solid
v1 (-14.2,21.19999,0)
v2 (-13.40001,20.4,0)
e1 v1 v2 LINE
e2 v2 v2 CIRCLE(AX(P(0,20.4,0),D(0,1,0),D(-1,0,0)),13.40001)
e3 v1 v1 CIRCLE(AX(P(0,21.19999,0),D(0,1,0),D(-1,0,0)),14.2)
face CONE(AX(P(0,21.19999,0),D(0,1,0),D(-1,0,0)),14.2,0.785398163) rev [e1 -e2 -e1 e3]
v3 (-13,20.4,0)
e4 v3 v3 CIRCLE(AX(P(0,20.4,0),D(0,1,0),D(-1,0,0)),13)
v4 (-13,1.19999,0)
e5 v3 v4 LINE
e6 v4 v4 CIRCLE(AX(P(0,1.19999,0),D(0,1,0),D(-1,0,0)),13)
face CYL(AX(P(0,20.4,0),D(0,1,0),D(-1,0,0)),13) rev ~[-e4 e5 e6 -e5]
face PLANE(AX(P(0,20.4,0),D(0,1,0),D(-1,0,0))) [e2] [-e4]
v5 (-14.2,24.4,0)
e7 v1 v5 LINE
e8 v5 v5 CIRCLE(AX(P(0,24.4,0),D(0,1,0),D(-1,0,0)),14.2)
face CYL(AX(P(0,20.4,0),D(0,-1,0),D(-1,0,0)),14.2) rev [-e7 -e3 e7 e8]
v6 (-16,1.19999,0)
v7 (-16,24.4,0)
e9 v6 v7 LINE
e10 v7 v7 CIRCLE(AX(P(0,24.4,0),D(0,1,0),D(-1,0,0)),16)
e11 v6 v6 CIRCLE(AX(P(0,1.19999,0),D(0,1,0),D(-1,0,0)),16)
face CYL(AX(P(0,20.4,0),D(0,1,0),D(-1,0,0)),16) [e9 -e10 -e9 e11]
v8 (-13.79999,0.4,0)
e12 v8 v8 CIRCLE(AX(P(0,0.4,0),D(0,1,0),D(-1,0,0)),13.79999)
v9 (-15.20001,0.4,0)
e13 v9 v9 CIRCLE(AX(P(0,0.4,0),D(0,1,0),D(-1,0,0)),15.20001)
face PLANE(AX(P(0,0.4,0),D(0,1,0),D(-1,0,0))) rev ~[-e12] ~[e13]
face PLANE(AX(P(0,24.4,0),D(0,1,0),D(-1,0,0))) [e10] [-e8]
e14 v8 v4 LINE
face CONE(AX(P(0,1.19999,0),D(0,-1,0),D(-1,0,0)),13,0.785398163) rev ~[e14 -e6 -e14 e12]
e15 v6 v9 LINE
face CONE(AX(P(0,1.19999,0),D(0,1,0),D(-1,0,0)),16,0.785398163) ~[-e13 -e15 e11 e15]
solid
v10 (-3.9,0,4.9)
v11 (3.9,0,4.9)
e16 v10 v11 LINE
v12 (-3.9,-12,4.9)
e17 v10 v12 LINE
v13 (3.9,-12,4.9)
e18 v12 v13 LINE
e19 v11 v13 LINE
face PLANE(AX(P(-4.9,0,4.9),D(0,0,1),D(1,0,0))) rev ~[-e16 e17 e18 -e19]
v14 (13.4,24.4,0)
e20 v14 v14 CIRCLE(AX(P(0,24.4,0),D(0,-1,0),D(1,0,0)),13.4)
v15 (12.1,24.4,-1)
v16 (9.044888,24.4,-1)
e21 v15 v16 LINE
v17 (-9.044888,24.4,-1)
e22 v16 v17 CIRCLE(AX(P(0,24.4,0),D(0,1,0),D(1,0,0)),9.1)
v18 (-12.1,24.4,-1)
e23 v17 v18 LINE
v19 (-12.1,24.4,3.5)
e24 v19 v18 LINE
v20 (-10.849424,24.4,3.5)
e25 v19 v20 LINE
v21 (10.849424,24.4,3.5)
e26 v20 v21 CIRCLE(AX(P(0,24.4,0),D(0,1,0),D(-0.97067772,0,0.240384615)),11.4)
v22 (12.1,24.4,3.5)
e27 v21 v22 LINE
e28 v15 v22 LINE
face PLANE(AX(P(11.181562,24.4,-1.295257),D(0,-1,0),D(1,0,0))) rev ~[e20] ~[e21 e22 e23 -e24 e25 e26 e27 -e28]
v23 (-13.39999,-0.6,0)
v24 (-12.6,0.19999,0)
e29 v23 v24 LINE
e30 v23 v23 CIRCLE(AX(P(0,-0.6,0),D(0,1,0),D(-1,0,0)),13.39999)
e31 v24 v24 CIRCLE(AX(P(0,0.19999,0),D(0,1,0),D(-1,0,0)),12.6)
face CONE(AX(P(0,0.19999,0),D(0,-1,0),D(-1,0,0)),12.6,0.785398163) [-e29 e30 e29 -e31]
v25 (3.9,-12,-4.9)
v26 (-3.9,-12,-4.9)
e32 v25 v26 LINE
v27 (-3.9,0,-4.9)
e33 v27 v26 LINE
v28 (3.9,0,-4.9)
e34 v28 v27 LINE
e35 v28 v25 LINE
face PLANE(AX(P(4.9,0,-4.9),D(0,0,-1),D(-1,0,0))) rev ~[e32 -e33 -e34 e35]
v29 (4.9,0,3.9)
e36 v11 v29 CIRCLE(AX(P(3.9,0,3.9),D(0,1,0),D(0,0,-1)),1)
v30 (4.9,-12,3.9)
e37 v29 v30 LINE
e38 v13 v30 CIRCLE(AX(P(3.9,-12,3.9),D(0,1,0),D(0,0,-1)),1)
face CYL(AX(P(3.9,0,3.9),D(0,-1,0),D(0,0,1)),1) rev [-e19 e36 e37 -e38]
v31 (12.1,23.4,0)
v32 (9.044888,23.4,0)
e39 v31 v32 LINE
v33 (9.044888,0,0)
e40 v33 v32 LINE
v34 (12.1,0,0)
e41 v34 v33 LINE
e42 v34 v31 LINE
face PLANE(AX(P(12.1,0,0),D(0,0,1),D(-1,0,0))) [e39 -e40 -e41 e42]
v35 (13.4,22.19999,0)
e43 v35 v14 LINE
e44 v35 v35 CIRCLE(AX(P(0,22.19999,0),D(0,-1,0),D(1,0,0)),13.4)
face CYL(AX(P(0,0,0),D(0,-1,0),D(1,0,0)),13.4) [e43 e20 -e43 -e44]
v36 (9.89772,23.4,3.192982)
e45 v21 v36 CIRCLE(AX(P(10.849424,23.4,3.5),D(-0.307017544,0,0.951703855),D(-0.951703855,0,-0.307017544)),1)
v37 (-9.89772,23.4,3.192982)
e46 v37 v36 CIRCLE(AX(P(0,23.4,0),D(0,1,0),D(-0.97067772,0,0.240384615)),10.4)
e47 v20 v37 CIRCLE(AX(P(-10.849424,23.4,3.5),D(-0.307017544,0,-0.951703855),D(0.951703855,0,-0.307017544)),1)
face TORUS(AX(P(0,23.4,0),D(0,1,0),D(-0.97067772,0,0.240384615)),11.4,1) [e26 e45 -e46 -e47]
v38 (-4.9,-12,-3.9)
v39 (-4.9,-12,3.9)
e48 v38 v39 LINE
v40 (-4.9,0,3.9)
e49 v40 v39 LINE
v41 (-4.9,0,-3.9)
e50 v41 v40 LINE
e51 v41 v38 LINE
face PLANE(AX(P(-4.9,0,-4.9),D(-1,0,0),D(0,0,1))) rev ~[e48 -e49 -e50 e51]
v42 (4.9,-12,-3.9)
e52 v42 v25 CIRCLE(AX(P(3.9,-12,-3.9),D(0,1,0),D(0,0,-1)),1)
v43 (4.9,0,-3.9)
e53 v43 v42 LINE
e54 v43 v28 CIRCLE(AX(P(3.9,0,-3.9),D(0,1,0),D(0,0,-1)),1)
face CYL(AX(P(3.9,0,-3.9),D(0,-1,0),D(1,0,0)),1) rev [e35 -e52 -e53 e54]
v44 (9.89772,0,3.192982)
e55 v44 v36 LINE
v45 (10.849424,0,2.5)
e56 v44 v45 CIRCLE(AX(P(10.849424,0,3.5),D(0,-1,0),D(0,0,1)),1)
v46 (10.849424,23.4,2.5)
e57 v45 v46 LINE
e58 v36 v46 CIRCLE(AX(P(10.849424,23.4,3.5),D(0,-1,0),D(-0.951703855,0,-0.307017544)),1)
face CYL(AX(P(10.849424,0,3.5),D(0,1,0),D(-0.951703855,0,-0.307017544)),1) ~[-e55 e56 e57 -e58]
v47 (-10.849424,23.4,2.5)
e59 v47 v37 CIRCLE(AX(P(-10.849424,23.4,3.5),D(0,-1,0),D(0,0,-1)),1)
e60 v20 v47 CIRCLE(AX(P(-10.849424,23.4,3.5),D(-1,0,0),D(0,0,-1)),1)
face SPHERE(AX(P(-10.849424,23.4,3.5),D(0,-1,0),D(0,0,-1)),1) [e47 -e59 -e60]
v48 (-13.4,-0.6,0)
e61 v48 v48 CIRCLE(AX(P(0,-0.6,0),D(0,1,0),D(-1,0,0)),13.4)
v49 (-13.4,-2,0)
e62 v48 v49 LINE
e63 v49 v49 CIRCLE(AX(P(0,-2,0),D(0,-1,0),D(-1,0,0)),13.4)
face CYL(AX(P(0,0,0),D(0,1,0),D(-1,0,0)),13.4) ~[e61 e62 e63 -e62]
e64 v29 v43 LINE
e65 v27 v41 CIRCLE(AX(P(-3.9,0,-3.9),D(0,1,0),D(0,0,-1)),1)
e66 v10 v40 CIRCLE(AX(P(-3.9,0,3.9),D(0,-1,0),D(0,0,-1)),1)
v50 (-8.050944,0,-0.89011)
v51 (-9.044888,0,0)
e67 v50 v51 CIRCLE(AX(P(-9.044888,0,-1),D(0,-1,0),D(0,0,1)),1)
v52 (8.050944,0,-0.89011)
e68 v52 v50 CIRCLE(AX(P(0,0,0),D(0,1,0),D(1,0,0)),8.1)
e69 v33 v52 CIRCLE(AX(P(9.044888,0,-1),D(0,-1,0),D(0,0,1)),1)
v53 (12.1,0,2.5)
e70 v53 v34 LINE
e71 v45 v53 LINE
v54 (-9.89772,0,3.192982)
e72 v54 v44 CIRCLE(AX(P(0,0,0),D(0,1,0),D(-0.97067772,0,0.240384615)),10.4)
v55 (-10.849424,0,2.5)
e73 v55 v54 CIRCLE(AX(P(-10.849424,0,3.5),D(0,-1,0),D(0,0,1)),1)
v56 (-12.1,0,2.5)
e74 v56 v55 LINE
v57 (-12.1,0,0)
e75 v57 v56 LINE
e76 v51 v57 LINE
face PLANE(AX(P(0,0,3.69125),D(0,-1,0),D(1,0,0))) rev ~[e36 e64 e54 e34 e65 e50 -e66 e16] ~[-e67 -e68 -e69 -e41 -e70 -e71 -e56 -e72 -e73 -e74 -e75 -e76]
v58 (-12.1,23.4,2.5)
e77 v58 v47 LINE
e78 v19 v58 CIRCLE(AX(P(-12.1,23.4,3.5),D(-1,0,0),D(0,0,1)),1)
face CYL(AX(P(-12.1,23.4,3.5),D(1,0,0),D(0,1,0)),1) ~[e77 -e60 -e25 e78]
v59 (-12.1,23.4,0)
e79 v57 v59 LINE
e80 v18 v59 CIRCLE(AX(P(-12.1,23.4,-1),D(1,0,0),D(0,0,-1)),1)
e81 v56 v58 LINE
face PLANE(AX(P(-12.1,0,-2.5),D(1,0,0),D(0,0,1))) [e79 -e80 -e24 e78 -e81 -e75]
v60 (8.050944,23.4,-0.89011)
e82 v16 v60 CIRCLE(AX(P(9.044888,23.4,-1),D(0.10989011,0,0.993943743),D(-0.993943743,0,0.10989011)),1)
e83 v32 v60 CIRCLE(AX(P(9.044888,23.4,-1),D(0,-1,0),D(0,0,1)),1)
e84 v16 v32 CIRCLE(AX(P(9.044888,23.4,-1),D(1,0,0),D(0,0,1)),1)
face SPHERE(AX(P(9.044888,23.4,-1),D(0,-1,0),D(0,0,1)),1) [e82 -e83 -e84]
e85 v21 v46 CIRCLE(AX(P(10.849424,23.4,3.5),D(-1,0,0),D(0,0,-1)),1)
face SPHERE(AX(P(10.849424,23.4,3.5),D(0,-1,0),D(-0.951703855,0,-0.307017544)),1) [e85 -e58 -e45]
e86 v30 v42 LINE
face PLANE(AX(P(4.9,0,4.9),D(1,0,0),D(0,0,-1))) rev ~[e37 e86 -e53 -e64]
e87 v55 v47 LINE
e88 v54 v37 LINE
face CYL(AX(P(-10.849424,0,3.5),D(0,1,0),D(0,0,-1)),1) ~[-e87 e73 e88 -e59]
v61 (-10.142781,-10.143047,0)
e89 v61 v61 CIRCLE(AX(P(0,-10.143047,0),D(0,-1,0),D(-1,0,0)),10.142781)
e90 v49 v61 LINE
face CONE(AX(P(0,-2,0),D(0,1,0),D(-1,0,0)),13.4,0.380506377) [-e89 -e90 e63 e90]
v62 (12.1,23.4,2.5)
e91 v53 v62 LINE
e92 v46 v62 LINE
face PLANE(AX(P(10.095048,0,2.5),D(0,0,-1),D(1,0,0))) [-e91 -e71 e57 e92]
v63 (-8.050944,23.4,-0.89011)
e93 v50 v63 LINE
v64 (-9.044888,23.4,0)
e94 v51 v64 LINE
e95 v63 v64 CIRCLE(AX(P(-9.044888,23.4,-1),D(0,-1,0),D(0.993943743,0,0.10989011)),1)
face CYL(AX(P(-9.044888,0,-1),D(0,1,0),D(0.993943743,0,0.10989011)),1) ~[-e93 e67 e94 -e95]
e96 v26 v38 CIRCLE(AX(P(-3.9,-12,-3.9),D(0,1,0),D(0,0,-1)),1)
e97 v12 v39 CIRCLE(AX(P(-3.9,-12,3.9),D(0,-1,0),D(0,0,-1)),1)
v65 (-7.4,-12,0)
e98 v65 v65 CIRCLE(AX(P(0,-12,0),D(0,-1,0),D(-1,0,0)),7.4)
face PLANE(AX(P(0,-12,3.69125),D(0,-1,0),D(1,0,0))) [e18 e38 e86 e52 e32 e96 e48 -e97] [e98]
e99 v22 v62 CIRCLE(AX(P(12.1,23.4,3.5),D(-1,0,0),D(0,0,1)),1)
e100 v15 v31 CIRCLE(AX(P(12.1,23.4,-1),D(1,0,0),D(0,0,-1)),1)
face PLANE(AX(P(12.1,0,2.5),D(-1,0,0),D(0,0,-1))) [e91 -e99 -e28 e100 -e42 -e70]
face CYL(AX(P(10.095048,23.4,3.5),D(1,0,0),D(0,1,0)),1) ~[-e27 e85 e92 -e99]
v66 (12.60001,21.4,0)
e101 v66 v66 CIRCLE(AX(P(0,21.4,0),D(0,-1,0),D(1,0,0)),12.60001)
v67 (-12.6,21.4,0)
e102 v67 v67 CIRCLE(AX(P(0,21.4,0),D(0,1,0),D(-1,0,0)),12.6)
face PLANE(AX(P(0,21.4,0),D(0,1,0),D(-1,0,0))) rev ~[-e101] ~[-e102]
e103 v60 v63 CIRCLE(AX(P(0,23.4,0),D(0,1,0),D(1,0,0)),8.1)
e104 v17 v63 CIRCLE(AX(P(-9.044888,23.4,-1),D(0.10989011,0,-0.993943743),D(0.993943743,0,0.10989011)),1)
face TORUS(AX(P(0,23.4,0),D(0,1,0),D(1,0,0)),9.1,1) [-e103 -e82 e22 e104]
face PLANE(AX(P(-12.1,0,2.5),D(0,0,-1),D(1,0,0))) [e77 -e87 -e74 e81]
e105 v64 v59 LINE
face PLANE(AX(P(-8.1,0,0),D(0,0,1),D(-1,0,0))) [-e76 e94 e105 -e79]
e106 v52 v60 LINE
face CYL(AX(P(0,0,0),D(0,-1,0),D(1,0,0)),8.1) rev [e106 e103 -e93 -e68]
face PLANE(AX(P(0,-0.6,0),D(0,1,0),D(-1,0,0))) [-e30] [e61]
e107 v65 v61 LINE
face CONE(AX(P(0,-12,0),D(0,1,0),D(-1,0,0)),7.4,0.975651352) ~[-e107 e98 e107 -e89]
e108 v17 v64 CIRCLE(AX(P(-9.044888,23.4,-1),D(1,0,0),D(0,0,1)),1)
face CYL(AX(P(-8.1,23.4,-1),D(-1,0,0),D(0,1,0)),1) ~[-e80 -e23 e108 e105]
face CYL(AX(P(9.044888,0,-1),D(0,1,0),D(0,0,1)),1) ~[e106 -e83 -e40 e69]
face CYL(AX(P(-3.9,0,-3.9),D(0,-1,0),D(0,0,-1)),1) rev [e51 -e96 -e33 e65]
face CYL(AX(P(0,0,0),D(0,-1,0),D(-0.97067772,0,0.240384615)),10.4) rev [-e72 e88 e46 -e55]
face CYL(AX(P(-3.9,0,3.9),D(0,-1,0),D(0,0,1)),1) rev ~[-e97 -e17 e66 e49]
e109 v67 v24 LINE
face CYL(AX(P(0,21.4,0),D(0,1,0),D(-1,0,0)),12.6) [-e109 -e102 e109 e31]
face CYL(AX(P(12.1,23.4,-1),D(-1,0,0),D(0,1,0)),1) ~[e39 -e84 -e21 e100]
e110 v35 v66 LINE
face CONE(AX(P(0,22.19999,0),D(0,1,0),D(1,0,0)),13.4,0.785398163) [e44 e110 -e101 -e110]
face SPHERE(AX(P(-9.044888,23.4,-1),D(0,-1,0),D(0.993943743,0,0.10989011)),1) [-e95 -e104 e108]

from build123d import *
from build123d import SkipClean  # not in build123d's __all__

# Parameters (mm, degrees)
F1_DEPTH   = 24.4
F2_DEPTH   = 12
F3_R       = 1
F4_DEPTH   = 24.4
F5_SIZE2   = 4
F5_SIZE    = 10
F7_R       = 13.4
F7_R_2     = 12.6
F8_DEPTH   = 22
F11_SIZE   = 2
F10_R      = 16
F10_R_2    = 14.2
F10_R_3    = 13
F12_DEPTH  = 20
F13_DEPTH  = 4
F14_SIZE   = 0.79999
F14_2_SIZE = 0.79999
F15_R      = 1


# Not quite as in the source:
# - two fillets or chamfers of one size are made in one step
# - a fillet or chamfer is up to 0.001 mm smaller than in the source, because OpenCascade refuses the exact size
# - after a boolean that leaves OpenCascade's solid faulty, fix() repairs it


with BuildPart() as f1:
    # F0 (on Front) → F1 (new body)
    with BuildSketch(Plane.XZ):
        with BuildLine():
            Line((12.1, -2.5), (10.0950482911, -2.5))
            ThreePointArc((10.0950482911, -2.5), (0, -10.4), (-10.0950482911, -2.5))
            Line((-10.0950482911, -2.5), (-12.1, -2.5))
            Line((-12.1, -2.5), (-12.1, 0))
            Line((-12.1, 0), (-13.4, 0))
            ThreePointArc((-13.4, 0), (0, -13.4), (13.4, 0))
            Line((13.4, 0), (12.1, 0))
            Line((12.1, 0), (12.1, -2.5))
        make_face()
        with BuildLine():
            ThreePointArc((-10.0950482911, 2.5), (0, 10.4), (10.0950482911, 2.5))
            Line((10.0950482911, 2.5), (12.1, 2.5))
            Line((12.1, 2.5), (12.1, 0))
            Line((12.1, 0), (13.4, 0))
            ThreePointArc((13.4, 0), (0, 13.4), (-13.4, 0))
            Line((-13.4, 0), (-12.1, 0))
            Line((-12.1, 0), (-12.1, 2.5))
            Line((-12.1, 2.5), (-10.0950482911, 2.5))
        make_face()
    extrude(amount=-F1_DEPTH)

    # F0 (on Front) → F2 (join)
    with BuildSketch(Plane.XZ):
        with BuildLine():
            Line((4.9, 0), (8.1, 0))
            ThreePointArc((8.1, 0), (0, 8.1), (-8.1, 0))
            Line((-8.1, 0), (-4.9, 0))
            Line((-4.9, 0), (-4.9, 4.9))
            Line((-4.9, 4.9), (4.9, 4.9))
            Line((4.9, 4.9), (4.9, 0))
        make_face()
        with BuildLine():
            Line((8.1, 0), (10.4, 0))
            ThreePointArc((10.4, 0), (10.3234805717, 1.2592652168), (10.0950482911, 2.5))
            ThreePointArc((10.0950482911, 2.5), (0, 10.4), (-10.0950482911, 2.5))
            ThreePointArc((-10.0950482911, 2.5), (-10.3234805717, 1.2592652168), (-10.4, 0))
            Line((-10.4, 0), (-8.1, 0))
            ThreePointArc((-8.1, 0), (0, 8.1), (8.1, 0))
        make_face()
        with BuildLine():
            ThreePointArc((-10.0950482911, 2.5), (0, 10.4), (10.0950482911, 2.5))
            Line((10.0950482911, 2.5), (12.1, 2.5))
            Line((12.1, 2.5), (12.1, 0))
            Line((12.1, 0), (13.4, 0))
            ThreePointArc((13.4, 0), (0, 13.4), (-13.4, 0))
            Line((-13.4, 0), (-12.1, 0))
            Line((-12.1, 0), (-12.1, 2.5))
            Line((-12.1, 2.5), (-10.0950482911, 2.5))
        make_face()
        with BuildLine():
            ThreePointArc((-8.1, 0), (0, -8.1), (8.1, 0))
            Line((8.1, 0), (4.9, 0))
            Line((4.9, 0), (4.9, -4.9))
            Line((4.9, -4.9), (-4.9, -4.9))
            Line((-4.9, -4.9), (-4.9, 0))
            Line((-4.9, 0), (-8.1, 0))
        make_face()
        with BuildLine():
            ThreePointArc((10.0950482911, -2.5), (10.3234805717, -1.2592652168), (10.4, 0))
            Line((10.4, 0), (8.1, 0))
            ThreePointArc((8.1, 0), (0, -8.1), (-8.1, 0))
            Line((-8.1, 0), (-10.4, 0))
            ThreePointArc((-10.4, 0), (-10.3234805717, -1.2592652168), (-10.0950482911, -2.5))
            ThreePointArc((-10.0950482911, -2.5), (0, -10.4), (10.0950482911, -2.5))
        make_face()
        with BuildLine():
            Line((12.1, -2.5), (10.0950482911, -2.5))
            ThreePointArc((10.0950482911, -2.5), (0, -10.4), (-10.0950482911, -2.5))
            Line((-10.0950482911, -2.5), (-12.1, -2.5))
            Line((-12.1, -2.5), (-12.1, 0))
            Line((-12.1, 0), (-13.4, 0))
            ThreePointArc((-13.4, 0), (0, -13.4), (13.4, 0))
            Line((13.4, 0), (12.1, 0))
            Line((12.1, 0), (12.1, -2.5))
        make_face()
        with BuildLine():
            Line((12.1, 0), (10.4, 0))
            ThreePointArc((10.4, 0), (10.3234805717, -1.2592652168), (10.0950482911, -2.5))
            Line((10.0950482911, -2.5), (12.1, -2.5))
            Line((12.1, -2.5), (12.1, 0))
        make_face()
        with BuildLine():
            ThreePointArc((10.0950482911, 2.5), (10.3234805717, 1.2592652168), (10.4, 0))
            Line((10.4, 0), (12.1, 0))
            Line((12.1, 0), (12.1, 2.5))
            Line((12.1, 2.5), (10.0950482911, 2.5))
        make_face()
        with BuildLine():
            Line((-12.1, -2.5), (-10.0950482911, -2.5))
            ThreePointArc((-10.0950482911, -2.5), (-10.3234805717, -1.2592652168), (-10.4, 0))
            Line((-10.4, 0), (-12.1, 0))
            Line((-12.1, 0), (-12.1, -2.5))
        make_face()
        with BuildLine():
            ThreePointArc((-10.4, 0), (-10.3234805717, 1.2592652168), (-10.0950482911, 2.5))
            Line((-10.0950482911, 2.5), (-12.1, 2.5))
            Line((-12.1, 2.5), (-12.1, 0))
            Line((-12.1, 0), (-10.4, 0))
        make_face()
    with SkipClean():  # cleaning this boolean's faces spoils the solid; the shape is the same uncleaned
        extrude(amount=F2_DEPTH)

    # F3
    f3_edges = [f1.edges().sort_by_distance(p)[0] for p in [
        (-4.9, -6, 4.9),
        (4.9, -6, 4.9),
        (4.9, -6, -4.9),
        (-4.9, -6, -4.9),
    ]]
    fillet(f3_edges, radius=F3_R)

    # F0 (on Front) → F4 (join, through all)
    with BuildSketch(Plane.XZ):
        with BuildLine():
            Line((12.1, 0), (10.4, 0))
            ThreePointArc((10.4, 0), (10.3234805717, -1.2592652168), (10.0950482911, -2.5))
            Line((10.0950482911, -2.5), (12.1, -2.5))
            Line((12.1, -2.5), (12.1, 0))
        make_face()
        with BuildLine():
            ThreePointArc((10.0950482911, -2.5), (10.3234805717, -1.2592652168), (10.4, 0))
            Line((10.4, 0), (8.1, 0))
            ThreePointArc((8.1, 0), (0, -8.1), (-8.1, 0))
            Line((-8.1, 0), (-10.4, 0))
            ThreePointArc((-10.4, 0), (-10.3234805717, -1.2592652168), (-10.0950482911, -2.5))
            ThreePointArc((-10.0950482911, -2.5), (0, -10.4), (10.0950482911, -2.5))
        make_face()
        with BuildLine():
            Line((-12.1, -2.5), (-10.0950482911, -2.5))
            ThreePointArc((-10.0950482911, -2.5), (-10.3234805717, -1.2592652168), (-10.4, 0))
            Line((-10.4, 0), (-12.1, 0))
            Line((-12.1, 0), (-12.1, -2.5))
        make_face()
    extrude(amount=-F4_DEPTH)

    add(f1.part.fix(), mode=Mode.REPLACE)

    # F5
    f5_edges = [f1.edges().sort_by_distance(p)[0] for p in [
        (13.4, -12, 0),
    ]]
    f5_side = f1.faces().sort_by_distance((13.4, -6, 0))[0]
    chamfer(f5_edges, length=F5_SIZE, length2=F5_SIZE2, reference=f5_side)

    # F7 (on offset) → F8 (cut)
    with BuildSketch(Plane(origin=(0, 21.4, 0), x_dir=(-1, 0, 0), z_dir=(0, 1, 0))):
        Circle(F7_R)
        Circle(F7_R_2, mode=Mode.SUBTRACT)
    extrude(amount=-F8_DEPTH, mode=Mode.SUBTRACT)

    # F11
    f11_edges = [f1.edges().sort_by_distance(p)[0] for p in [
        (9.4, -12, 0),
    ]]
    chamfer(f11_edges, length=F11_SIZE)

    # F14 (size 0.8 in the source; OpenCascade refuses exactly that, so slightly less here)
    f14_edges = [f1.edges().sort_by_distance(p)[0] for p in [
        (-13.4, 21.4, 0),
        (12.6, -0.6, 0),
    ]]
    chamfer(f14_edges, length=F14_SIZE)

    # F15
    f15_edges = [f1.edges().sort_by_distance(p)[0] for p in [
        (8.1, 12.2, 0),
        (-8.1, 12.2, 0),
        (10.1, 24.4, 0),
        (0, 24.4, -8.1),
        (-10.1, 24.4, 0),
        (-11.097524, 24.4, 2.5),
        (0, 24.4, 10.4),
        (11.097524, 24.4, 2.5),
        (-10.095048, 12.2, 2.5),
        (10.095048, 12.2, 2.5),
    ]]
    fillet(f15_edges, radius=F15_R)


with BuildPart() as f12:
    # F10 (on offset) → F12 (new body)
    with BuildSketch(Plane(origin=(0, 20.4, 0), x_dir=(-1, 0, 0), z_dir=(0, 1, 0))):
        Circle(F10_R)
        Circle(F10_R_2, mode=Mode.SUBTRACT)
        Circle(F10_R_2)
        Circle(F10_R_3, mode=Mode.SUBTRACT)
    extrude(amount=-F12_DEPTH)

    # F10 (on offset) → F13 (join, through all)
    with BuildSketch(Plane(origin=(0, 20.4, 0), x_dir=(-1, 0, 0), z_dir=(0, 1, 0))):
        Circle(F10_R)
        Circle(F10_R_2, mode=Mode.SUBTRACT)
    extrude(amount=F13_DEPTH)

    # F14#2 (size 0.8 in the source; OpenCascade refuses exactly that, so slightly less here)
    f14_2_edges = [f12.edges().sort_by_distance(p)[0] for p in [
        (16, 0.4, 0),
        (14.2, 20.4, 0),
        (13, 0.4, 0),
    ]]
    chamfer(f14_2_edges, length=F14_2_SIZE)


solid = Compound([f1.part, f12.part])
